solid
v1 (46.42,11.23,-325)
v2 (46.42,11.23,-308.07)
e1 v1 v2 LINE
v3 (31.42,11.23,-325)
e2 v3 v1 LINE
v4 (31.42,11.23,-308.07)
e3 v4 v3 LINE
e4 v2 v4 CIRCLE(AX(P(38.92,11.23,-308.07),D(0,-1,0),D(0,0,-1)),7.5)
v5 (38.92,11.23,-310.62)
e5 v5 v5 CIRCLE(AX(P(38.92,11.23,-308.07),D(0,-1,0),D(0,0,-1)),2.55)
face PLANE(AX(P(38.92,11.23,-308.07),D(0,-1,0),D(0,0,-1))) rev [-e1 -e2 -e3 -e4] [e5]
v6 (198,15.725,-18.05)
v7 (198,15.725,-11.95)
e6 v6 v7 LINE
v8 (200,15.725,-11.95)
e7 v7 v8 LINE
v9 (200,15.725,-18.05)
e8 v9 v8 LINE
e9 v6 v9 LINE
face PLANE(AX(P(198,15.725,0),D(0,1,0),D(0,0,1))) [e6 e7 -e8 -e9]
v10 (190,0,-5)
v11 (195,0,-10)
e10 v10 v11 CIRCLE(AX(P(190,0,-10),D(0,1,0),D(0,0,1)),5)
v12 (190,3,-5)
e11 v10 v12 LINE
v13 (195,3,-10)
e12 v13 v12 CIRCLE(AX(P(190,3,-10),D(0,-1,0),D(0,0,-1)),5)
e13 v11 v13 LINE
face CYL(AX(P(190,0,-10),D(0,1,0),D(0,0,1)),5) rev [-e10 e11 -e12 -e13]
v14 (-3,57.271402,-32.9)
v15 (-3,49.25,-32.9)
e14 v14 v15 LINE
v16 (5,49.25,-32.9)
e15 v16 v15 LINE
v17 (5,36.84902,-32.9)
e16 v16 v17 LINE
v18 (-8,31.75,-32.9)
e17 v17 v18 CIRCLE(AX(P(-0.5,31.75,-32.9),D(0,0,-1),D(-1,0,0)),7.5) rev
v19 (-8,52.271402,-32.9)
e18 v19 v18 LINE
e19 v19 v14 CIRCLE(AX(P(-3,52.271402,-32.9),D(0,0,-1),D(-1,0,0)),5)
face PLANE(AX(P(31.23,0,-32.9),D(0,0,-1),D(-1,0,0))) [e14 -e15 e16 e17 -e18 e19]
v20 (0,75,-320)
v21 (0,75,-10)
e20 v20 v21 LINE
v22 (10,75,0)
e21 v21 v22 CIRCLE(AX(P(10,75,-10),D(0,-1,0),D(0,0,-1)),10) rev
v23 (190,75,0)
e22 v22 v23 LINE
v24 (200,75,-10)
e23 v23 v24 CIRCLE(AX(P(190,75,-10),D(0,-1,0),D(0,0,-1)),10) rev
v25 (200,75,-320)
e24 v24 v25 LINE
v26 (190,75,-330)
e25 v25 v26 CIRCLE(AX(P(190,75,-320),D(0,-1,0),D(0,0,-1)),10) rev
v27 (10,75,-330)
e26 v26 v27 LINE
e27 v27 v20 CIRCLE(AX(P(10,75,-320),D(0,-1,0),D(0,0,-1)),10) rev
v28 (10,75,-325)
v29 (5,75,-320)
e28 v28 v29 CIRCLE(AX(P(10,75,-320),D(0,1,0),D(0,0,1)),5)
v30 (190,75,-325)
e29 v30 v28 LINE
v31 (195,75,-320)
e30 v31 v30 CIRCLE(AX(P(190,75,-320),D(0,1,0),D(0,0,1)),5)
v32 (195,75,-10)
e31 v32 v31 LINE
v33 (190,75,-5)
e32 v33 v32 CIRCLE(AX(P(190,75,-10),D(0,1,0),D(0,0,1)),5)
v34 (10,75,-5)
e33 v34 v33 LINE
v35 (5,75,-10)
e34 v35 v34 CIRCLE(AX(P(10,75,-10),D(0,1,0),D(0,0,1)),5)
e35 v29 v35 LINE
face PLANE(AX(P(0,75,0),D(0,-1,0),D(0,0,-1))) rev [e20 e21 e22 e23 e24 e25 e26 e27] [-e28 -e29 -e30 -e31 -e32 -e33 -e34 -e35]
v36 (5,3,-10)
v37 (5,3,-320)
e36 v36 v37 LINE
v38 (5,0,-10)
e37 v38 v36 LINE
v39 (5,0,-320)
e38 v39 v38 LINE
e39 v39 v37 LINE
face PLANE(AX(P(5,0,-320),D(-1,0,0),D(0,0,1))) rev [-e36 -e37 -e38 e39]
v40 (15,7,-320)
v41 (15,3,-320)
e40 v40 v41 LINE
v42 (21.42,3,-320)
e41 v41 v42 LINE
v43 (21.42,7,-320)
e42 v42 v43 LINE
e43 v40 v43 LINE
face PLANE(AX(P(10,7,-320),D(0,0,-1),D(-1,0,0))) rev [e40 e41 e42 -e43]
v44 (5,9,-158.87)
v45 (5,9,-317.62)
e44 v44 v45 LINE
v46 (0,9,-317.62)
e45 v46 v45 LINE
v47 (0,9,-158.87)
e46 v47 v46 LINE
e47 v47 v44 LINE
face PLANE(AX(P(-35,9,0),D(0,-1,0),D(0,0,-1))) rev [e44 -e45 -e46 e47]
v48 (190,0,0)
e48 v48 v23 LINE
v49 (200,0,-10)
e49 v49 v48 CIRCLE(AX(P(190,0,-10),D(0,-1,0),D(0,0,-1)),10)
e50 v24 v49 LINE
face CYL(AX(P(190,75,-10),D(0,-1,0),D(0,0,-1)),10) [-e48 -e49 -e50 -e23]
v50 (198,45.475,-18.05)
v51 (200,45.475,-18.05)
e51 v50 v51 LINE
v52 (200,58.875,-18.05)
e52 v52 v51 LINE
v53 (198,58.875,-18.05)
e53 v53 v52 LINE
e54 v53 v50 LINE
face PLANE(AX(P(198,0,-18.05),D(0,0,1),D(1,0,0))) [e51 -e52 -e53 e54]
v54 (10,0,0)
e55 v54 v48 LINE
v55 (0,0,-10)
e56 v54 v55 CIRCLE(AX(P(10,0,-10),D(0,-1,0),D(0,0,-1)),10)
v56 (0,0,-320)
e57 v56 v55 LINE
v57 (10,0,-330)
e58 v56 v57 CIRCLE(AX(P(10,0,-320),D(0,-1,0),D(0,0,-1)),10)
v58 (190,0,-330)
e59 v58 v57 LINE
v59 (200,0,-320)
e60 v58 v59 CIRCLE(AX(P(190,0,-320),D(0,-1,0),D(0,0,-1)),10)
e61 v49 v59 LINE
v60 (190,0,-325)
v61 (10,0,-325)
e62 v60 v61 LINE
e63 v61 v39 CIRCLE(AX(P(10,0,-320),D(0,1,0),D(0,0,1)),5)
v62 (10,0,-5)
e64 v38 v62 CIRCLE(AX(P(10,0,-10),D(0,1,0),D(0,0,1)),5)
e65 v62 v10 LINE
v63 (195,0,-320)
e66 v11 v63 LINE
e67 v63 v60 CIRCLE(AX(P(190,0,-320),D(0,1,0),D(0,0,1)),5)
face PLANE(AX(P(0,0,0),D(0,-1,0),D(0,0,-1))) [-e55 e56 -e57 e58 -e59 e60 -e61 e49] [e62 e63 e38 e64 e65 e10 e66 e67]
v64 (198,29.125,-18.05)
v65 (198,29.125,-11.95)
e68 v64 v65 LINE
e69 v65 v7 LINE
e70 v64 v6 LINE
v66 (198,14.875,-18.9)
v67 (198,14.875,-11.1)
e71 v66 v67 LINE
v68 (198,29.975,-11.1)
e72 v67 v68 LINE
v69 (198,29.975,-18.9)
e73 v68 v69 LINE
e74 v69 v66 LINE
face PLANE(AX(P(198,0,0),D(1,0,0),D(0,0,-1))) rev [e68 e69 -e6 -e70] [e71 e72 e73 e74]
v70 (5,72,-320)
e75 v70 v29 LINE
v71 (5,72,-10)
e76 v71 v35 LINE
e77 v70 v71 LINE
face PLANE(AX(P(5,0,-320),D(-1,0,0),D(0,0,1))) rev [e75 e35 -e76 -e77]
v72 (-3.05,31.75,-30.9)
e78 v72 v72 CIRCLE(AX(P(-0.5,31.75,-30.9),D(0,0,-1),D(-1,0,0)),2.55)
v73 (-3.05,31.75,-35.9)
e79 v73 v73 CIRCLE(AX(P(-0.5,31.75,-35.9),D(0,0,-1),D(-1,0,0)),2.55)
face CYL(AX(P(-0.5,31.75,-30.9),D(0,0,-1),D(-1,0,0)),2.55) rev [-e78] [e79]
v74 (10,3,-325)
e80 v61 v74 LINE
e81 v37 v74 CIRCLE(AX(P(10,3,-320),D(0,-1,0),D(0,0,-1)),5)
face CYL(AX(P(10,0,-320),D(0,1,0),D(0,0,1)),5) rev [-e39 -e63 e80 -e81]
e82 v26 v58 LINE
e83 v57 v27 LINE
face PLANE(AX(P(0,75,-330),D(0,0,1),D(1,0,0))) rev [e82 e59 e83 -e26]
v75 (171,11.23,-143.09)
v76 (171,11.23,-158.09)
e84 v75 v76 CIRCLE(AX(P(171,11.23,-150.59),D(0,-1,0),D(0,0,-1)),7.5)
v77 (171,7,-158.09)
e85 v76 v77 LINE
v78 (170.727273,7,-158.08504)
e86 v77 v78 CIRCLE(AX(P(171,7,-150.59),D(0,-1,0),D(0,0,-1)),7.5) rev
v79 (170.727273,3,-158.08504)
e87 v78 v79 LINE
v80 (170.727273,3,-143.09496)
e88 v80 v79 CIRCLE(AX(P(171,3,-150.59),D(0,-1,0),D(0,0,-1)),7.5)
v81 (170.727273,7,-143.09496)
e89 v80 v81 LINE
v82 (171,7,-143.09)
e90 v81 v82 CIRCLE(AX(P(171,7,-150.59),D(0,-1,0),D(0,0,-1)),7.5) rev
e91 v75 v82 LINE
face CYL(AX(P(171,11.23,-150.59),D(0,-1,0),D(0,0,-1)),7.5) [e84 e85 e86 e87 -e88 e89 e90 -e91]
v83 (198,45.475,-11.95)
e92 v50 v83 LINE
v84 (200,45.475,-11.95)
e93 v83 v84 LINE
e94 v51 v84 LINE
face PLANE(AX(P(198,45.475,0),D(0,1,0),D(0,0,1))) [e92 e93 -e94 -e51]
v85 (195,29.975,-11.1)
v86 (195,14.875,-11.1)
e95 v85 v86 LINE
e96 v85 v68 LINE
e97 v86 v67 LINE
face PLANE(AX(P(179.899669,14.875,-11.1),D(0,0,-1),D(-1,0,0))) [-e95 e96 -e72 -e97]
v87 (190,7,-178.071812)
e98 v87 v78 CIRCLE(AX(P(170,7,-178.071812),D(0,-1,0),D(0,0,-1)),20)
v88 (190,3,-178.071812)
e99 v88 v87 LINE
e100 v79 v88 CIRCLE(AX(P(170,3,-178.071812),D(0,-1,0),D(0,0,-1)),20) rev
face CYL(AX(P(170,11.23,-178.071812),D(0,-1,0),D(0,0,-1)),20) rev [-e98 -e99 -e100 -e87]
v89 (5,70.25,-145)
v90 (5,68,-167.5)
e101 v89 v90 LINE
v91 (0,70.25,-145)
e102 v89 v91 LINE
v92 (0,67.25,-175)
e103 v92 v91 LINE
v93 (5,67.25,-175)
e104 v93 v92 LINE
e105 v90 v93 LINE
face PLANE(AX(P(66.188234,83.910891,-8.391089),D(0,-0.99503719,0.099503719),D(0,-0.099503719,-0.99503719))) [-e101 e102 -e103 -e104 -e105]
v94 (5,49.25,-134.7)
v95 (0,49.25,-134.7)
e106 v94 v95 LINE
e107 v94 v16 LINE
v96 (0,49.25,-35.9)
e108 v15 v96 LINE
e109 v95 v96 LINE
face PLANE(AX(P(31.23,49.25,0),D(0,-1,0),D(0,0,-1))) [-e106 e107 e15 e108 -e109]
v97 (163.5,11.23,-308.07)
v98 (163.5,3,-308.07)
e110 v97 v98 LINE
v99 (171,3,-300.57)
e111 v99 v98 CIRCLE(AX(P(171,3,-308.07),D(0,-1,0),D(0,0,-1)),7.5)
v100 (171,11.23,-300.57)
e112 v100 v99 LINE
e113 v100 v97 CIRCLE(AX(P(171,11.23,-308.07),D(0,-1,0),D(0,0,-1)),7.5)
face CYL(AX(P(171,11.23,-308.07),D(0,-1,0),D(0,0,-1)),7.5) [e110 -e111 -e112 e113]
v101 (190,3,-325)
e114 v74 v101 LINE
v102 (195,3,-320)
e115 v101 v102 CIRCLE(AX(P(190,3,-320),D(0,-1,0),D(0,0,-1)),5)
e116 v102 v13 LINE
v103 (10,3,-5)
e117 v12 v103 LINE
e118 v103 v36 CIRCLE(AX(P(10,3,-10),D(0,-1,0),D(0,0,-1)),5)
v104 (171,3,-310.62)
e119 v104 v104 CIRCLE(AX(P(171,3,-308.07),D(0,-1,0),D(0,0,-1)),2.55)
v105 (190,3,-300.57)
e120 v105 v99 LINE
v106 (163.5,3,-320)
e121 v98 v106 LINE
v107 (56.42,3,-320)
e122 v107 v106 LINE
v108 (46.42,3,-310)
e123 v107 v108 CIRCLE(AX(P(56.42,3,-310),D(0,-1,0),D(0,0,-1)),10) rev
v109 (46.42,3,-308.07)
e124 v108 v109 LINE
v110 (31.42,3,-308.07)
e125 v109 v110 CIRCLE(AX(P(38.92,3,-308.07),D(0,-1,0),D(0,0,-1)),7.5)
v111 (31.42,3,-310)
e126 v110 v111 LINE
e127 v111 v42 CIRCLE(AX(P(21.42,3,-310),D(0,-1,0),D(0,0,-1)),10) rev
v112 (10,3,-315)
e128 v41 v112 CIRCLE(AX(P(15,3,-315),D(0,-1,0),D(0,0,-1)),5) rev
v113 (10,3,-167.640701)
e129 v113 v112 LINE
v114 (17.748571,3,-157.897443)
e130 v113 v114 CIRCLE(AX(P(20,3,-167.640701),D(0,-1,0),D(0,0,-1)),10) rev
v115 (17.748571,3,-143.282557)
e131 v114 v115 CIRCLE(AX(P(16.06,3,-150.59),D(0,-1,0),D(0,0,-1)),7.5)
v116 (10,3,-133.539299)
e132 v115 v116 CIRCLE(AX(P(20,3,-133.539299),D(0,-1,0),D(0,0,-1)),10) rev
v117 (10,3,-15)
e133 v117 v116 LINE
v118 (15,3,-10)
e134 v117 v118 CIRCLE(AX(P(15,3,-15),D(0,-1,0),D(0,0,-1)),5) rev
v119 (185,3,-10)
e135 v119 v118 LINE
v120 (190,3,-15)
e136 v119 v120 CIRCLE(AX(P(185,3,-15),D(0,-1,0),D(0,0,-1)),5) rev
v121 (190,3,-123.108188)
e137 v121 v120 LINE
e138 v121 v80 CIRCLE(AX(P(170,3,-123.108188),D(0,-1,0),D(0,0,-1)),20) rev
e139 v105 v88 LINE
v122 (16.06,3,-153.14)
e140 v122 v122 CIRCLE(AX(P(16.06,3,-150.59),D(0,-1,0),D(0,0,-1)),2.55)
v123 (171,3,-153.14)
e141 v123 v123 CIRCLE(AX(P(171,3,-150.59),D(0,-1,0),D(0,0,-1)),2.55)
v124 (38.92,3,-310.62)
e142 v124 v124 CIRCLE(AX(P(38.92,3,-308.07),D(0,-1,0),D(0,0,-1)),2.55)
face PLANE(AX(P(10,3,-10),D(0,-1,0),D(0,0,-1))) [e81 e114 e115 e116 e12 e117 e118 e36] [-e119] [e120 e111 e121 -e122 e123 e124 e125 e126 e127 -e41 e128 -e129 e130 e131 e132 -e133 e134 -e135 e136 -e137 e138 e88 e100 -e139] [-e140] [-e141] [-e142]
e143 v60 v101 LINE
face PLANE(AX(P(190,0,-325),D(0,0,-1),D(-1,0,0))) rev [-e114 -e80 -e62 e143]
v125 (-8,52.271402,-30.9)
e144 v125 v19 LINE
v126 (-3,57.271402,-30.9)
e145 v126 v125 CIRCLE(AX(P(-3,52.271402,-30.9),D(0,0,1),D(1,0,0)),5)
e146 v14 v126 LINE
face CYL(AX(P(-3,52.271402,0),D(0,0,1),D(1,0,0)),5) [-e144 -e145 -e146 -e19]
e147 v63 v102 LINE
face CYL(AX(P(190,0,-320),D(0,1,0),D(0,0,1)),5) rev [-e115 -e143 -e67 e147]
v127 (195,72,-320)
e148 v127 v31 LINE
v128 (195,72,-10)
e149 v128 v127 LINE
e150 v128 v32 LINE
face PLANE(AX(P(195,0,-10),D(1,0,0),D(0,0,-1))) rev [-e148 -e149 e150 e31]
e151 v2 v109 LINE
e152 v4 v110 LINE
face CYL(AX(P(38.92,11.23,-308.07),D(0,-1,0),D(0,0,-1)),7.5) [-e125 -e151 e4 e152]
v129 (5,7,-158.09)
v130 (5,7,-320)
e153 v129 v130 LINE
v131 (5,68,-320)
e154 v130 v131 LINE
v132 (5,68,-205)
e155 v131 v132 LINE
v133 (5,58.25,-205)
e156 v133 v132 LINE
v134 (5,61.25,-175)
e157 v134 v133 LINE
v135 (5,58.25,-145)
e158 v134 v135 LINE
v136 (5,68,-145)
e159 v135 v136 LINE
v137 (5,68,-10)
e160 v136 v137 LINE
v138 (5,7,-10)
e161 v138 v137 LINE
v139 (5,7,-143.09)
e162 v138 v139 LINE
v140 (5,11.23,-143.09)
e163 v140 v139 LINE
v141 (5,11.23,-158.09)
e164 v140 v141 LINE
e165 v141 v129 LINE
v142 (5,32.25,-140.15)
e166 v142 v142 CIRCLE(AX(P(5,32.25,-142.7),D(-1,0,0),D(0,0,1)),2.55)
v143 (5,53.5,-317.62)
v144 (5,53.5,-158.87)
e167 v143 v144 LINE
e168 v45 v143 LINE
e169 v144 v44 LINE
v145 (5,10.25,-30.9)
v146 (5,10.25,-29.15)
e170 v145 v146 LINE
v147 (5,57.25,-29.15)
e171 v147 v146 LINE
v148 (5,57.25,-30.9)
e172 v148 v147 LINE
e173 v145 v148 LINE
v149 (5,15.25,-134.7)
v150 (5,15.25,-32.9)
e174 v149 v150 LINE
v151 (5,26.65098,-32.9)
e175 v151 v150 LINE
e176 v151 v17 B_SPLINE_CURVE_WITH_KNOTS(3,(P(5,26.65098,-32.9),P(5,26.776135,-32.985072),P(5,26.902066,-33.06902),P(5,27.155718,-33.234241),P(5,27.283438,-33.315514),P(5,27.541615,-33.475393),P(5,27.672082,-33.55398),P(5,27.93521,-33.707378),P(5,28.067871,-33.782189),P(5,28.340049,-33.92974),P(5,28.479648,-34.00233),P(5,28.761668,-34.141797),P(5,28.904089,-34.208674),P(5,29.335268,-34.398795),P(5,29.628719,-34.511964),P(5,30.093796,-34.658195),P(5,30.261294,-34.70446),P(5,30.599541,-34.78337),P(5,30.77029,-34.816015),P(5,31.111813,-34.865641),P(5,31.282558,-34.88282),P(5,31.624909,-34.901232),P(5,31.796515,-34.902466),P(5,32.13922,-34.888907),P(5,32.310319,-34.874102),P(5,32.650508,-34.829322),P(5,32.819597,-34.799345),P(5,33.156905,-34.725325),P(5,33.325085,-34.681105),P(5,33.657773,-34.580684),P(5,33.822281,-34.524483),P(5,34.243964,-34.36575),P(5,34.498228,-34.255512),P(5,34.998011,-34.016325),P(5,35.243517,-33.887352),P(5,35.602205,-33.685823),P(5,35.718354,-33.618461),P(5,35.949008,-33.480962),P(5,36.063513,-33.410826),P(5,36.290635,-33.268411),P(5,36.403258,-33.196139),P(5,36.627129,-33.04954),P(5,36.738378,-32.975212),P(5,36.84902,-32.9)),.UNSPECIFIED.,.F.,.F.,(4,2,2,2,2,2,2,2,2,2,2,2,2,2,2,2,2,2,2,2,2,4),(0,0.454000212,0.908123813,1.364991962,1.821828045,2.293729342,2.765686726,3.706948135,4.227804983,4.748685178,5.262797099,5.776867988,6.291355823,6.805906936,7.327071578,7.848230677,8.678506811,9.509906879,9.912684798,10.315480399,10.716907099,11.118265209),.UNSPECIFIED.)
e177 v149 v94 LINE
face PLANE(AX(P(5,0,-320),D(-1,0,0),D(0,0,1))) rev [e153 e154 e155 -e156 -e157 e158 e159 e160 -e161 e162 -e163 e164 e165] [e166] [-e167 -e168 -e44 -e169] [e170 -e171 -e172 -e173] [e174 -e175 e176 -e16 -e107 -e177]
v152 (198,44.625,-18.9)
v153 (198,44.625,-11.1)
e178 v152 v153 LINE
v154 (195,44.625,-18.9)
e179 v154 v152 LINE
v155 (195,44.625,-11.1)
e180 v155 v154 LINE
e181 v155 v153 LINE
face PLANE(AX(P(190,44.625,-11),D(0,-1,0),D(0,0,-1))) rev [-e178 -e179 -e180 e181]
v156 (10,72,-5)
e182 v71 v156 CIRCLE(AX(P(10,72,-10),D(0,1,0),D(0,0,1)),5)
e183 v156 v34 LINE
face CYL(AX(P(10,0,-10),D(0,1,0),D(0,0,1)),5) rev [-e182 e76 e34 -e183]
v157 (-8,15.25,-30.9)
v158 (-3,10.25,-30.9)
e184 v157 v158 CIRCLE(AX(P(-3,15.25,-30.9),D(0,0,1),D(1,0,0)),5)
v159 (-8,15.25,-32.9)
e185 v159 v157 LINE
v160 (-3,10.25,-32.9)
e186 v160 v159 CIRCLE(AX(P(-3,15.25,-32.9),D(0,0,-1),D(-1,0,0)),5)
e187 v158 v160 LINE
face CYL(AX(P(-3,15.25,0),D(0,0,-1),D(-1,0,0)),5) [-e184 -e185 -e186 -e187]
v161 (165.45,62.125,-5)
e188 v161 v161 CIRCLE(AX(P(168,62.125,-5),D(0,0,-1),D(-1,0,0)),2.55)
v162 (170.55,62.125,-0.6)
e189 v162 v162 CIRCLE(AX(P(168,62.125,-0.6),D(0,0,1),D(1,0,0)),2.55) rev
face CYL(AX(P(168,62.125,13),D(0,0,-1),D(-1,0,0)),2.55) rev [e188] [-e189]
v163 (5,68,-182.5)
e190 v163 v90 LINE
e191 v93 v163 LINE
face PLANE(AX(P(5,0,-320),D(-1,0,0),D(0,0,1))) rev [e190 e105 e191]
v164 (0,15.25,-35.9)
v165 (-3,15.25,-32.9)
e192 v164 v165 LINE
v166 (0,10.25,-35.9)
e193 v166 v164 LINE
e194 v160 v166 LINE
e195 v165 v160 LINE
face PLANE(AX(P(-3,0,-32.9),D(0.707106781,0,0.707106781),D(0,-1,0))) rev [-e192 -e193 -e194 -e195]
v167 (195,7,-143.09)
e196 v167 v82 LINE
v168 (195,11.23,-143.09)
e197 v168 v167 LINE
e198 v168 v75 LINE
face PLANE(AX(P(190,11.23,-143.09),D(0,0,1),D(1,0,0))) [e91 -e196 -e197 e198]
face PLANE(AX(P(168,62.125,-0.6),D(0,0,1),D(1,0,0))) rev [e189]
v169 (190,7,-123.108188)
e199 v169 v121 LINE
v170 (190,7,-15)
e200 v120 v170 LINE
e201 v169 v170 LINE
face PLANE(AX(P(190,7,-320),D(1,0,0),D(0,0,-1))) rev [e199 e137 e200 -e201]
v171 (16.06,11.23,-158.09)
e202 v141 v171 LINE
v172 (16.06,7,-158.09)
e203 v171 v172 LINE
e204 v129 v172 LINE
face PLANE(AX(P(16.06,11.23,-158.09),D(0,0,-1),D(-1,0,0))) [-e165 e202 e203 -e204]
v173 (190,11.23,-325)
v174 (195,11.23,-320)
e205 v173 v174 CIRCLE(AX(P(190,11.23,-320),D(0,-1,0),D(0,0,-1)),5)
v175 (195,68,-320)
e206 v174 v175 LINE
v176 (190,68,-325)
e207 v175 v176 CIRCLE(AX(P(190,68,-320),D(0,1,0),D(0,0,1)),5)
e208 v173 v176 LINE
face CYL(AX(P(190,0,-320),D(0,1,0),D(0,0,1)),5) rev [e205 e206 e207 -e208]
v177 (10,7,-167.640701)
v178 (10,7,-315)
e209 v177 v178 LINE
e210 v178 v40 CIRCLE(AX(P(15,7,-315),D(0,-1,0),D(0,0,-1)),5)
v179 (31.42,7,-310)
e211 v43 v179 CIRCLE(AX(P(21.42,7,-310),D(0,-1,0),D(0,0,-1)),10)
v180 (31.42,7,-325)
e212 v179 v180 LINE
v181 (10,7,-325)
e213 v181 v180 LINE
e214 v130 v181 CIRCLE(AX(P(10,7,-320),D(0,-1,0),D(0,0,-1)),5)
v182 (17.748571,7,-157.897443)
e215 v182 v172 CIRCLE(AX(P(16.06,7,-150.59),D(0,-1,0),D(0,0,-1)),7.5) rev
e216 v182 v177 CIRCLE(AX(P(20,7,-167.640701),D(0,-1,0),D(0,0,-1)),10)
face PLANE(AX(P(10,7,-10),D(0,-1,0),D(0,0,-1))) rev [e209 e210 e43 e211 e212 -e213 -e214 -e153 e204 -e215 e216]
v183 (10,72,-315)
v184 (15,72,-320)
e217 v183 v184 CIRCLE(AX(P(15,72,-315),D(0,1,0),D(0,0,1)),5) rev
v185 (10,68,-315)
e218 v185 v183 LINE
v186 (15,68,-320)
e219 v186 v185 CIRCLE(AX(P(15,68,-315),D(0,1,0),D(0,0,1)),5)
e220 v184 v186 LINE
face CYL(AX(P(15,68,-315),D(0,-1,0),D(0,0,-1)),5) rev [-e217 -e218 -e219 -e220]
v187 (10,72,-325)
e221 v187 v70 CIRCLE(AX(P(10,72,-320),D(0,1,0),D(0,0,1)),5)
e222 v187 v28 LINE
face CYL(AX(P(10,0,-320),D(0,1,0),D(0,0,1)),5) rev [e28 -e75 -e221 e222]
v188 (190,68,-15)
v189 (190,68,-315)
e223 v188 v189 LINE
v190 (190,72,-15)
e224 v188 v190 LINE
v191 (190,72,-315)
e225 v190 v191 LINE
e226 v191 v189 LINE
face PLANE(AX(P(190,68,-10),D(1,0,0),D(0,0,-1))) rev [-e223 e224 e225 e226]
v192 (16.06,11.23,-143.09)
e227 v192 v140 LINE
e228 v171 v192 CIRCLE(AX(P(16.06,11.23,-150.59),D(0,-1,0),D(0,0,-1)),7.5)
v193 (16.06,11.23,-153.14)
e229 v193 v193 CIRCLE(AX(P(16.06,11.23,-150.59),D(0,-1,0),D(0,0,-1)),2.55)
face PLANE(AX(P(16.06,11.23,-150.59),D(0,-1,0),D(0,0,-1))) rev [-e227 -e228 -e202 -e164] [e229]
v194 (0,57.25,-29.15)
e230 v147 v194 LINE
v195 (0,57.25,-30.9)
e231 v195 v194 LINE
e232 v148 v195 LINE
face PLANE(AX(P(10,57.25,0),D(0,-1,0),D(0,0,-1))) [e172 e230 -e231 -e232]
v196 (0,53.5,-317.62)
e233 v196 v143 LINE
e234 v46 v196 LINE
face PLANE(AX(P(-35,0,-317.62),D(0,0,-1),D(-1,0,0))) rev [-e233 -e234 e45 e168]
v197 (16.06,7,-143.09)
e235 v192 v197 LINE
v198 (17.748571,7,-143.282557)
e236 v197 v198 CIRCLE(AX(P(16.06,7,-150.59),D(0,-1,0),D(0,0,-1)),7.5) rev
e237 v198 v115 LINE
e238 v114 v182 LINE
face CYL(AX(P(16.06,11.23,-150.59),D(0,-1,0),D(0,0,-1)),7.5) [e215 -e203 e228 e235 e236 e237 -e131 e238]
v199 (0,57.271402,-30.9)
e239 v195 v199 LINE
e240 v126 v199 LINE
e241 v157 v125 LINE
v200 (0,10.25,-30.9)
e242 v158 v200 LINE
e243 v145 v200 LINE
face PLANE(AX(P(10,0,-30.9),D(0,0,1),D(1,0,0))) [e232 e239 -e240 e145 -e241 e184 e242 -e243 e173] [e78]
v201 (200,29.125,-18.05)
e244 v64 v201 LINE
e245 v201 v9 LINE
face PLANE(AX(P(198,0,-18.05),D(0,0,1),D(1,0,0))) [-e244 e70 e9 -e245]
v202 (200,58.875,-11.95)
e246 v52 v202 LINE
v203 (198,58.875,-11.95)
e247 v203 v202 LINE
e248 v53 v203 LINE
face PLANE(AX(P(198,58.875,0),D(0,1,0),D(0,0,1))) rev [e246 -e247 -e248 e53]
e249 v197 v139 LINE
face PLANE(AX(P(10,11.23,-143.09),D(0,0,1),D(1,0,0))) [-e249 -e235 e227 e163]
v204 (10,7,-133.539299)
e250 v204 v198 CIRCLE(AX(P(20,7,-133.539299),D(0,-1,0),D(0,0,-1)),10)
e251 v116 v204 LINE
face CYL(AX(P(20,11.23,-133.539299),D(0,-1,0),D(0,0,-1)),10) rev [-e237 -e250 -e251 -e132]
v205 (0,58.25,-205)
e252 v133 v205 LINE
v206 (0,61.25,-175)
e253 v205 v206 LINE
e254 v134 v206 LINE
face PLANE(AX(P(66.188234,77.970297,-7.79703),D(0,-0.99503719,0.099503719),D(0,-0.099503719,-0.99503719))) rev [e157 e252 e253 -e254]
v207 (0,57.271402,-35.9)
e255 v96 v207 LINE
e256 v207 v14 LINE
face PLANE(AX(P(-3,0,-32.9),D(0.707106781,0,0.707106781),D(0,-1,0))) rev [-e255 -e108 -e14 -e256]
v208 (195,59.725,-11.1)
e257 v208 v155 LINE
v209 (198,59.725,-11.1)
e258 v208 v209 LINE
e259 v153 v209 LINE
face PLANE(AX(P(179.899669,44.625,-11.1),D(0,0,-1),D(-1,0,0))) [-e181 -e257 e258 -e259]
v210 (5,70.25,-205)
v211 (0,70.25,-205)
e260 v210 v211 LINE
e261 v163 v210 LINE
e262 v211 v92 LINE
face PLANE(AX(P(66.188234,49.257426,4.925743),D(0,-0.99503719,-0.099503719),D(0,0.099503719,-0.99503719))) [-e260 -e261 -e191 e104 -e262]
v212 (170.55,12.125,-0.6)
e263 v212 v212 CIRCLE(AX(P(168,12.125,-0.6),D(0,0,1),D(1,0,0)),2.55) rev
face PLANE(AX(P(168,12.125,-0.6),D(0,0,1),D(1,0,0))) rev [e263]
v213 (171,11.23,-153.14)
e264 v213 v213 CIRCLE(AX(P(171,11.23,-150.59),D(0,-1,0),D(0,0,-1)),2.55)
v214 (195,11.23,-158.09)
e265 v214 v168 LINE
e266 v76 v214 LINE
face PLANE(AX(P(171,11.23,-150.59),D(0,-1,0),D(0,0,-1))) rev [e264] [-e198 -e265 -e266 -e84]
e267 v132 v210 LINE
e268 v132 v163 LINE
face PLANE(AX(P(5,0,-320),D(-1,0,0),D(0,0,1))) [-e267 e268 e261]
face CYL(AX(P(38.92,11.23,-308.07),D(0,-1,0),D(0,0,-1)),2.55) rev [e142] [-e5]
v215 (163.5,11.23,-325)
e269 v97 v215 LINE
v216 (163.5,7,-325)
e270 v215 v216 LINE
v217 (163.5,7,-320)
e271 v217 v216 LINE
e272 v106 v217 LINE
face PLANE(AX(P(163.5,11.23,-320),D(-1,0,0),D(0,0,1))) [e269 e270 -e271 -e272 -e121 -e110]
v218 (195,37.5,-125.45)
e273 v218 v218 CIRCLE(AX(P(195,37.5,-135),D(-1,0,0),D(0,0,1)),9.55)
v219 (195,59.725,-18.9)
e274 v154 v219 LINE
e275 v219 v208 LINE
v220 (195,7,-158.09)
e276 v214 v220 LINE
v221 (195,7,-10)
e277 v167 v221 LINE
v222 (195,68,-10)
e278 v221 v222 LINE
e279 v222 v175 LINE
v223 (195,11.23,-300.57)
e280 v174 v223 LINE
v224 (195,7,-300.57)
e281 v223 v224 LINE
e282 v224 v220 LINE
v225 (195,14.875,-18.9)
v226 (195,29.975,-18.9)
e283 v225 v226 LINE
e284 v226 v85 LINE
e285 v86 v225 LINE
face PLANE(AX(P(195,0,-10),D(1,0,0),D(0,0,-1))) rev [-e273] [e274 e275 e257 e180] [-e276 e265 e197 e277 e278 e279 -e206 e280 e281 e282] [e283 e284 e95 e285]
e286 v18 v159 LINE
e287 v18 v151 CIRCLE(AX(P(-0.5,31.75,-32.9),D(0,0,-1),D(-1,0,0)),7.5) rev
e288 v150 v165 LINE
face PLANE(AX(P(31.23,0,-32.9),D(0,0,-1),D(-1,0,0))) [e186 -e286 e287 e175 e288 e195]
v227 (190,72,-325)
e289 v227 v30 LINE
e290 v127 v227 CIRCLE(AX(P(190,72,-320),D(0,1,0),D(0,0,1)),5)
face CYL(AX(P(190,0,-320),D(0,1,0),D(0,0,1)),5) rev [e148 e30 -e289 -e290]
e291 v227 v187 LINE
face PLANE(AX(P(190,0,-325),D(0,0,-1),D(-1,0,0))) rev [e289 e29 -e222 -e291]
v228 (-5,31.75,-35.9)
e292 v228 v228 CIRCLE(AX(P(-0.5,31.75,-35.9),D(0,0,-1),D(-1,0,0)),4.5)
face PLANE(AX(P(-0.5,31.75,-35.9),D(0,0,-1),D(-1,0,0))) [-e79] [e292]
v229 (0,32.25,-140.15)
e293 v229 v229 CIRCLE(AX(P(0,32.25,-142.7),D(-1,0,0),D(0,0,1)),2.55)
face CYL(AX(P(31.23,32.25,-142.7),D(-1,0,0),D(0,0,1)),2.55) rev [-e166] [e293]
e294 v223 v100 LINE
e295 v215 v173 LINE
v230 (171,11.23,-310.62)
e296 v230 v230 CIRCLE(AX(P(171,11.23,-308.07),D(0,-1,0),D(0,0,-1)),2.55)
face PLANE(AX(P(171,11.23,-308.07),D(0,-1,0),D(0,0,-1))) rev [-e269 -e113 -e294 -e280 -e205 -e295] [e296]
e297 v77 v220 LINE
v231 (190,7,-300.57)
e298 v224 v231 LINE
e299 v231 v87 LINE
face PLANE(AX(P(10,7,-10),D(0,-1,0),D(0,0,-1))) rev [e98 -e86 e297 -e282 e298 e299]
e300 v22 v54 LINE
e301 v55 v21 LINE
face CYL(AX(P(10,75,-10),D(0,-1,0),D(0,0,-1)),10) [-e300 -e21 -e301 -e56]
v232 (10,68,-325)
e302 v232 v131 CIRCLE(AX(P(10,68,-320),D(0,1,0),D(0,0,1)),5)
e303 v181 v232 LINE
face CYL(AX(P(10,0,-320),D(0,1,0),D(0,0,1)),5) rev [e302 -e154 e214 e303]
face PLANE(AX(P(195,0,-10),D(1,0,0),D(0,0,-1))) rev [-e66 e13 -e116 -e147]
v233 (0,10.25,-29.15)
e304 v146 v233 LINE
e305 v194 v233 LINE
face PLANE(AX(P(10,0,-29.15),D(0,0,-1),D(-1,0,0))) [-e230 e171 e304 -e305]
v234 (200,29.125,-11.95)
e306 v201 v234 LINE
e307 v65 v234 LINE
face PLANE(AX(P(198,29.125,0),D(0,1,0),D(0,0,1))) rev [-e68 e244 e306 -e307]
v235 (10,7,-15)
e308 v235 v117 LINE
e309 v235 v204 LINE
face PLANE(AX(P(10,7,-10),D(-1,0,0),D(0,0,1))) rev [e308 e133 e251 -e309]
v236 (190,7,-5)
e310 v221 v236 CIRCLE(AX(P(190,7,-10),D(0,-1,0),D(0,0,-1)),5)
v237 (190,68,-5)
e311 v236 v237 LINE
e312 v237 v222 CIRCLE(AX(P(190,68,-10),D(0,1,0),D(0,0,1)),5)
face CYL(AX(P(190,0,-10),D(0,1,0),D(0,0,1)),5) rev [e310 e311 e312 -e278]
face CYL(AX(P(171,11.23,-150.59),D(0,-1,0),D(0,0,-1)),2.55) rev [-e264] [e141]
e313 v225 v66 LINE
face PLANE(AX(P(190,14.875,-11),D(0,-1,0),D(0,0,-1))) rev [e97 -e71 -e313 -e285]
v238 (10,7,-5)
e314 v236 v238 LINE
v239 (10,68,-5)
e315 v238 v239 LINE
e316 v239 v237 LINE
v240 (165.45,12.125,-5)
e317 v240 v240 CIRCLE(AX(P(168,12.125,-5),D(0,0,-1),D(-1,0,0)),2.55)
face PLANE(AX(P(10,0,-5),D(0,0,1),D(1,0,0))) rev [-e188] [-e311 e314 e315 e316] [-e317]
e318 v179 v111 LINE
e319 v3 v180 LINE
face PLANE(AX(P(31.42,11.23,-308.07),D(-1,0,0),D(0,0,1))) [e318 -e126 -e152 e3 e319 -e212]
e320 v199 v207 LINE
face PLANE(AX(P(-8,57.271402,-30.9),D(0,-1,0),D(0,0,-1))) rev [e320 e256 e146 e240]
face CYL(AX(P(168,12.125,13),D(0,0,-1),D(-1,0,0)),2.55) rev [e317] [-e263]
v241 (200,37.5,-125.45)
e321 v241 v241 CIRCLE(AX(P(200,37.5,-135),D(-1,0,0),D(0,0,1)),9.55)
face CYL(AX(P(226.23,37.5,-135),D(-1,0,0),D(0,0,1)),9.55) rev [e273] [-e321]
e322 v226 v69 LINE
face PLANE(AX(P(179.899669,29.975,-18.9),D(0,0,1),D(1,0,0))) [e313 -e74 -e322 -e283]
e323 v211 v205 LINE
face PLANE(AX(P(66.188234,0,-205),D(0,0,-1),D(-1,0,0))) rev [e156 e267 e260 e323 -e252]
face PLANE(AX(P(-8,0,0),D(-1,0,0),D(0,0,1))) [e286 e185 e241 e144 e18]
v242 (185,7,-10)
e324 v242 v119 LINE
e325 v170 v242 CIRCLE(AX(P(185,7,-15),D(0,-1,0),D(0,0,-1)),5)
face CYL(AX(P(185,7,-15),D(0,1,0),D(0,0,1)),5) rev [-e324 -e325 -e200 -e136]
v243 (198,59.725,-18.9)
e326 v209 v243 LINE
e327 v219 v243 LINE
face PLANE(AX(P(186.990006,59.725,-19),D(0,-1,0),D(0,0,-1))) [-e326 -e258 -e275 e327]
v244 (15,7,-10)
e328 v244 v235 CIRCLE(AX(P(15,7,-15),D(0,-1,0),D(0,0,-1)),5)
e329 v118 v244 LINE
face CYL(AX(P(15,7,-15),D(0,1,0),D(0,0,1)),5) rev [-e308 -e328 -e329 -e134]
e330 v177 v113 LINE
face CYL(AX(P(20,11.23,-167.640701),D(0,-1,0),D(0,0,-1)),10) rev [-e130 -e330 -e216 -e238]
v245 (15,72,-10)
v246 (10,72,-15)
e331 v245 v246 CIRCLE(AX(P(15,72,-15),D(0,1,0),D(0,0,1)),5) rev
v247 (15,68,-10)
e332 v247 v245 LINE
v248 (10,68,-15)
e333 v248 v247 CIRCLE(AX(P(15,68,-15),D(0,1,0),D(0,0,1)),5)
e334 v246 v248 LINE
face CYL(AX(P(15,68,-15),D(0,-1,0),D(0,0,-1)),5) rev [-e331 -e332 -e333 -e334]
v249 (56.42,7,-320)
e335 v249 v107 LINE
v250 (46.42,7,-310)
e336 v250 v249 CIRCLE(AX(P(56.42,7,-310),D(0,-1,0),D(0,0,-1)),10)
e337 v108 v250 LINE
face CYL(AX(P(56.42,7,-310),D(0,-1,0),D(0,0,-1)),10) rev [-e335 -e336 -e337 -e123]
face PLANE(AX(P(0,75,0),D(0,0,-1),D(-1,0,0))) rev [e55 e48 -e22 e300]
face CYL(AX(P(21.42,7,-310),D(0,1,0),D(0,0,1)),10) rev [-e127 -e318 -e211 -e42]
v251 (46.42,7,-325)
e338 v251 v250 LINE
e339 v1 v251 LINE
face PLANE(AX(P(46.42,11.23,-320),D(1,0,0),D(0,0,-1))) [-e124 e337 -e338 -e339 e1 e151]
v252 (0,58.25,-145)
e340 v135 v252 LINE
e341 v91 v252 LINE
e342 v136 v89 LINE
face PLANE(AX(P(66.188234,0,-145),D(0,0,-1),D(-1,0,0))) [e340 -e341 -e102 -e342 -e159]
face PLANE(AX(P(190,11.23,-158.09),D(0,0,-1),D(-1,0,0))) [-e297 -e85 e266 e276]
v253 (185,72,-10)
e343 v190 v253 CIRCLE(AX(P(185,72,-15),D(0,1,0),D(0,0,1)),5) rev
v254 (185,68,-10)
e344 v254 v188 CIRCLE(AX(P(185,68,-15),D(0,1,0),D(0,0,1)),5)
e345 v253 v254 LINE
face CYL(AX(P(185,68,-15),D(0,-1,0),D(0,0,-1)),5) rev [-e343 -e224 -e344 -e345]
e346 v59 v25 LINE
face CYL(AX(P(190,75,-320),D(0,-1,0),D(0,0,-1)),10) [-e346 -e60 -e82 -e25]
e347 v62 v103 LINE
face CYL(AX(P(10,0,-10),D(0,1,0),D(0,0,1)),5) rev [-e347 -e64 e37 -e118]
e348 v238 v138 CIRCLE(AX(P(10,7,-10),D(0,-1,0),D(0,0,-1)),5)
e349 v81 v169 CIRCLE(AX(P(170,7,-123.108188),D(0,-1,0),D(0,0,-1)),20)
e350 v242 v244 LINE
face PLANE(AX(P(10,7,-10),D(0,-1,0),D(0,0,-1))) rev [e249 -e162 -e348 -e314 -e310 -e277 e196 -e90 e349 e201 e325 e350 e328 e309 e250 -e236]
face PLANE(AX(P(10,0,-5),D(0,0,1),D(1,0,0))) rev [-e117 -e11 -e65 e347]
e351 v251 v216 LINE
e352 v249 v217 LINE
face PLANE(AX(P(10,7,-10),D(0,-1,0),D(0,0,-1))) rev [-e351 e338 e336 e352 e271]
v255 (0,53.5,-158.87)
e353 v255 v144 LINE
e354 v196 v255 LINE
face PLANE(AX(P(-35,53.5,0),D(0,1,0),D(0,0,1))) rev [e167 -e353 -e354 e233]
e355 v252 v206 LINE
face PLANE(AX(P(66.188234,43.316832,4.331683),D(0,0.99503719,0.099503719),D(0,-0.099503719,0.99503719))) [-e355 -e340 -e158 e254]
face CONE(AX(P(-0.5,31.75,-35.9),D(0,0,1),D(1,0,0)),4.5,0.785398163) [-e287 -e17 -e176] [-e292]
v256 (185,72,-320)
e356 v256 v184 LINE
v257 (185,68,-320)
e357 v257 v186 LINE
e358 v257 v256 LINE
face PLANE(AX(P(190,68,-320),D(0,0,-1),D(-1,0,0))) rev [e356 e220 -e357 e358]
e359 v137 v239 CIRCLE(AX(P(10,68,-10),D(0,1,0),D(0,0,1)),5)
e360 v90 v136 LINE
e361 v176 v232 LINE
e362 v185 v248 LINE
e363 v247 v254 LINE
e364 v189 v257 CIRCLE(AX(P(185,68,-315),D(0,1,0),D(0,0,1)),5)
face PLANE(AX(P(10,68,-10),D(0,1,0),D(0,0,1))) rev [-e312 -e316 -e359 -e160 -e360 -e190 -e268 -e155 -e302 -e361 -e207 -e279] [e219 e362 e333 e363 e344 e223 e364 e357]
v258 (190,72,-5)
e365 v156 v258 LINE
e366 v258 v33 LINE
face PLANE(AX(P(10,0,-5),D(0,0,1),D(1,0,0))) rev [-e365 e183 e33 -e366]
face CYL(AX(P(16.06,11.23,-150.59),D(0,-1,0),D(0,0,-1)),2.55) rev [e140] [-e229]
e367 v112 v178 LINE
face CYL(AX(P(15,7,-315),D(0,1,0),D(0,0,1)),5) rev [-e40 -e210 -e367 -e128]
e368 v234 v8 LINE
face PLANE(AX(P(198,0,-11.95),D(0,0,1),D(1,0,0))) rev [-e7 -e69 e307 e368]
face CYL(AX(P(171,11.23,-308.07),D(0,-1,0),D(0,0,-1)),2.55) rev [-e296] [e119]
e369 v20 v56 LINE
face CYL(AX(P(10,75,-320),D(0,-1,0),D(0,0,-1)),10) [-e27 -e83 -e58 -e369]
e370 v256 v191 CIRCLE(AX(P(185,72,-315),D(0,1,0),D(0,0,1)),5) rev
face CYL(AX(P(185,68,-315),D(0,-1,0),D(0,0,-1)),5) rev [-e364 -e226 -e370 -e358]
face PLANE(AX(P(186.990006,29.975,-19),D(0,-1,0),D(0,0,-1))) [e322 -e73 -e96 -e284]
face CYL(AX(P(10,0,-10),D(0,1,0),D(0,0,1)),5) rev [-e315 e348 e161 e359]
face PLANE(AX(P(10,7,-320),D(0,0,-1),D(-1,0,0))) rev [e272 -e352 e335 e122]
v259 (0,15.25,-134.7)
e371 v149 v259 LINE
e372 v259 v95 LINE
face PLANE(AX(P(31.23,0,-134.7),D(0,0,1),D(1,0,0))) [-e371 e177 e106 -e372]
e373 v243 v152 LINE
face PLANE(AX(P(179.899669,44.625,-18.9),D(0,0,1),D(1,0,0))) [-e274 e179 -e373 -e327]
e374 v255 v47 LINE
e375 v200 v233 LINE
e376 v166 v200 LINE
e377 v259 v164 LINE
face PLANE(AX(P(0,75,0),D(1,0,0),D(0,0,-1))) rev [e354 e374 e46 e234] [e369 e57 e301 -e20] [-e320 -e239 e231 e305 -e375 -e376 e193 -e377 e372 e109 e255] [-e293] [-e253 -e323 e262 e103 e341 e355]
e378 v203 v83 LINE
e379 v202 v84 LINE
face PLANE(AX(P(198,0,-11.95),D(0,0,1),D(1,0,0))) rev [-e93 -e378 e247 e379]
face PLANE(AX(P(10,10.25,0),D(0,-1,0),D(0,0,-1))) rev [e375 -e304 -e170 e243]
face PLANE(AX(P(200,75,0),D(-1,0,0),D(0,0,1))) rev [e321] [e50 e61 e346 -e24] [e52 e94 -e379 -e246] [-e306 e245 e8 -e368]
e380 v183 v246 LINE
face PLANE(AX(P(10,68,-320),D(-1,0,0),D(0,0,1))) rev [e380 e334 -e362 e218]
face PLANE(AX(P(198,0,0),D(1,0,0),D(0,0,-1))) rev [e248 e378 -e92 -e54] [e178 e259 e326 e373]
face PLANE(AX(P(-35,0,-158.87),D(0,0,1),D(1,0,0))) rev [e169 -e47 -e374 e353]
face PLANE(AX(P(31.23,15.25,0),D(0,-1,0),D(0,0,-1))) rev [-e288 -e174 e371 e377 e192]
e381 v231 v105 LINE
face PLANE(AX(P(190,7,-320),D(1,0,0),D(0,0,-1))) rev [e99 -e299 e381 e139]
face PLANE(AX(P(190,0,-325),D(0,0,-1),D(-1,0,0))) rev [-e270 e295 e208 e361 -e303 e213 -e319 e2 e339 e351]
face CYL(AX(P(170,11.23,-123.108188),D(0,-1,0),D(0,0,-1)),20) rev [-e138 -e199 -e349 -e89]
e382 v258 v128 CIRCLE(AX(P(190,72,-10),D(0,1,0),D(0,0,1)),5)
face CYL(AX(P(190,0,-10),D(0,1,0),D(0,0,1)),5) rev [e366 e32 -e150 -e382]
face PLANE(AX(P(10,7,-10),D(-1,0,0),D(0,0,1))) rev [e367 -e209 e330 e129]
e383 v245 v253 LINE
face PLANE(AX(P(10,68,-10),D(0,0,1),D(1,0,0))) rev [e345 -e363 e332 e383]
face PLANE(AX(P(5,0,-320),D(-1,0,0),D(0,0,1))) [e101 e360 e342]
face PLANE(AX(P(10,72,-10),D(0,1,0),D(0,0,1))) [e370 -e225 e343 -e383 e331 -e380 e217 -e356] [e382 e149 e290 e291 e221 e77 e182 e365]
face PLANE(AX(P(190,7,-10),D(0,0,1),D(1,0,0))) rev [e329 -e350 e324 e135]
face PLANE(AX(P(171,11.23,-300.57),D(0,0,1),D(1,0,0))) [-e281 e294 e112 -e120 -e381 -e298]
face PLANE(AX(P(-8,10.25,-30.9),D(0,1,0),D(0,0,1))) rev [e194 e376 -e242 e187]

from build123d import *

# Parameters (mm, degrees)
SKETCH1_W            = 200
SKETCH1_H            = 330
BOSS_EXTRUDE1_DEPTH  = 75
FILLET1_R            = 10
CUT_EXTRUDE1_DEPTH   = 75
SKETCH3_W            = 180
SKETCH3_H            = 310
BOSS_EXTRUDE2_DEPTH  = 4
BOSS_EXTRUDE3_START  = -4
SKETCH4_W            = 180
SKETCH4_H            = 310
BOSS_EXTRUDE3_DEPTH  = 4
SKETCH8_W            = 158.75
SKETCH8_H            = 44.5
CUT_EXTRUDE2_DEPTH   = 40
BOSS_EXTRUDE4_START  = -8.23
SKETCH11_R           = 2.55
BOSS_EXTRUDE4_DEPTH  = 8.23
SKETCH12_R           = 2.55
SKETCH12_W           = 101.8
SKETCH12_H           = 34
CUT_EXTRUDE3_DEPTH   = 31.23
SKETCH13_R           = 9.55
CUT_EXTRUDE4_DEPTH   = 31.23
FILLET2_R            = 10
FILLET3_R            = 20
FILLET4_R            = 5
CUT_EXTRUDE5_DEPTH   = 10
SKETCH15_W           = 2
SKETCH15_H           = 47.02140159
BOSS_EXTRUDE5_DEPTH  = 8
SKETCH16_R           = 2.55
CUT_EXTRUDE6_DEPTH   = 2
BOSS_EXTRUDE6_START  = 3
SKETCH17_R           = 4.5
SKETCH17_R_2         = 2.55
BOSS_EXTRUDE6_DEPTH  = 3
CHAMFER1_SIZE        = 3
FILLET5_R            = 5
CHAMFER2_SIZE        = 3
SKETCH19_W           = 7
SKETCH19_H           = 14.5
CUT_EXTRUDE8_DEPTH   = 18
SKETCH22_W           = 7
SKETCH22_H           = 0.375
CUT_EXTRUDE9_DEPTH   = 18
SKETCH23_W           = 7
SKETCH23_H           = 0.375
BOSS_EXTRUDE7_DEPTH  = 5
SKETCH20_R           = 2.55
CUT_EXTRUDE10_DEPTH  = 18
SKETCH24_W           = 8
SKETCH24_H           = 15.5
CUT_EXTRUDE12_DEPTH  = 10
SKETCH25_W           = 8
SKETCH25_H           = 0.4
BOSS_EXTRUDE8_DEPTH  = 5
SKETCH26_W           = 0.1
SKETCH26_H           = 15.1
BOSS_EXTRUDE9_DEPTH  = 5
BOSS_EXTRUDE10_DEPTH = 2
SKETCH28_W           = 12.985784693
SKETCH28_H           = 10.415883014
BOSS_EXTRUDE11_DEPTH = 5
BOSS_EXTRUDE12_START = -0.6
SKETCH29_R           = 2.55
BOSS_EXTRUDE12_DEPTH = 0.6
CUT_EXTRUDE13_DEPTH  = 5


with BuildPart() as part:
    # Sketch1 → Boss-Extrude1 (new body)
    with BuildSketch(Plane(origin=(0, 0, 0), x_dir=(1, 0, 0), z_dir=(0, 1, 0))):
        with Locations((100, 165)):
            Rectangle(SKETCH1_W, SKETCH1_H)
    extrude(amount=BOSS_EXTRUDE1_DEPTH)

    # Fillet1
    fillet1_edges = [part.edges().sort_by_distance(p)[0] for p in [
        (0, 37.5, -330),
        (200, 37.5, -330),
        (200, 37.5, 0),
        (0, 37.5, 0),
    ]]
    fillet(fillet1_edges, radius=FILLET1_R)

    # Sketch2 → Cut-Extrude1 (cut)
    with BuildSketch(Plane(origin=(0, 75, 0), x_dir=(1, 0, 0), z_dir=(0, 1, 0))):
        with BuildLine():
            Line((190, 325), (10, 325))
            ThreePointArc((10, 325), (6.464466094, 323.535533906), (5, 320))
            Line((5, 320), (5, 10))
            ThreePointArc((5, 10), (6.464466094, 6.464466094), (10, 5))
            Line((10, 5), (190, 5))
            ThreePointArc((190, 5), (193.535533906, 6.464466094), (195, 10))
            Line((195, 10), (195, 320))
            ThreePointArc((195, 320), (193.535533906, 323.535533906), (190, 325))
        make_face()
    extrude(amount=-CUT_EXTRUDE1_DEPTH, mode=Mode.SUBTRACT)

    # Sketch3 → Boss-Extrude2 (add)
    with BuildSketch(Plane(origin=(0, 72, 0), x_dir=(1, 0, 0), z_dir=(0, 1, 0))):
        with BuildLine():
            Line((10, 5), (190, 5))
            ThreePointArc((190, 5), (193.535533906, 6.464466094), (195, 10))
            Line((195, 10), (195, 320))
            ThreePointArc((195, 320), (193.535533906, 323.535533906), (190, 325))
            Line((190, 325), (10, 325))
            ThreePointArc((10, 325), (6.464466094, 323.535533906), (5, 320))
            Line((5, 320), (5, 10))
            ThreePointArc((5, 10), (6.464466094, 6.464466094), (10, 5))
        make_face()
        with Locations((100, 165)):
            Rectangle(SKETCH3_W, SKETCH3_H, mode=Mode.SUBTRACT)
    extrude(amount=-BOSS_EXTRUDE2_DEPTH)

    # Sketch4 → Boss-Extrude3 (add)
    with BuildSketch(Plane(origin=(0, 3, 0), x_dir=(-1, 0, 0), z_dir=(0, -1, 0)).offset(BOSS_EXTRUDE3_START)):
        with BuildLine():
            Line((-5, 10), (-5, 320))
            ThreePointArc((-5, 320), (-6.464466094, 323.535533906), (-10, 325))
            Line((-10, 325), (-190, 325))
            ThreePointArc((-190, 325), (-193.535533906, 323.535533906), (-195, 320))
            Line((-195, 320), (-195, 10))
            ThreePointArc((-195, 10), (-193.535533906, 6.464466094), (-190, 5))
            Line((-190, 5), (-10, 5))
            ThreePointArc((-10, 5), (-6.464466094, 6.464466094), (-5, 10))
        make_face()
        with Locations((-100, 165)):
            Rectangle(SKETCH4_W, SKETCH4_H, mode=Mode.SUBTRACT)
    extrude(amount=BOSS_EXTRUDE3_DEPTH)

    # Sketch8 → Cut-Extrude2 (cut)
    with BuildSketch(Plane(origin=(5, 0, 0), x_dir=(0, 0, -1), z_dir=(1, 0, 0))):
        with Locations((238.245, 31.25)):
            Rectangle(SKETCH8_W, SKETCH8_H)
    extrude(amount=-CUT_EXTRUDE2_DEPTH, mode=Mode.SUBTRACT)

    # Sketch11 → Boss-Extrude4 (add)
    # profile 1 of 4: a face of its own
    with BuildSketch(Plane.XZ.offset(-3).offset(BOSS_EXTRUDE4_START)):
        with BuildLine():
            Line((16.06, -158.09), (10, -158.09))
            Line((10, -158.09), (5, -158.09))
            Line((5, -158.09), (5, -143.09))
            Line((5, -143.09), (10, -143.09))
            Line((10, -143.09), (16.06, -143.09))
            ThreePointArc((16.06, -143.09), (23.56, -150.59), (16.06, -158.09))
        make_face()
        with Locations(Location((16.06, -150.59, 0), (0, 0, 270))):
            Circle(SKETCH11_R, mode=Mode.SUBTRACT)
    # profile 2 of 4: a face of its own
    with BuildSketch(Plane.XZ.offset(-3).offset(BOSS_EXTRUDE4_START)):
        with BuildLine():
            Line((31.42, -308.07), (31.42, -320))
            Line((31.42, -320), (31.42, -325))
            Line((31.42, -325), (46.42, -325))
            Line((46.42, -325), (46.42, -320))
            Line((46.42, -320), (46.42, -308.07))
            ThreePointArc((46.42, -308.07), (38.92, -300.57), (31.42, -308.07))
        make_face()
        with Locations(Location((38.92, -308.07, 0), (0, 0, 270))):
            Circle(SKETCH11_R, mode=Mode.SUBTRACT)
    # profile 3 of 4: a face of its own
    with BuildSketch(Plane.XZ.offset(-3).offset(BOSS_EXTRUDE4_START)):
        with BuildLine():
            Line((171, -300.57), (190, -300.57))
            Line((190, -300.57), (195, -300.57))
            Line((195, -300.57), (195, -320))
            ThreePointArc((195, -320), (193.535533906, -323.535533906), (190, -325))
            Line((190, -325), (163.5, -325))
            Line((163.5, -325), (163.5, -320))
            Line((163.5, -320), (163.5, -308.07))
            ThreePointArc((163.5, -308.07), (165.696699141, -302.766699141), (171, -300.57))
        make_face()
        with Locations(Location((171, -308.07, 0), (0, 0, 270))):
            Circle(SKETCH11_R, mode=Mode.SUBTRACT)
    # profile 4 of 4: a face of its own
    with BuildSketch(Plane.XZ.offset(-3).offset(BOSS_EXTRUDE4_START)):
        with BuildLine():
            Line((171, -158.09), (190, -158.09))
            Line((190, -158.09), (195, -158.09))
            Line((195, -158.09), (195, -143.09))
            Line((195, -143.09), (190, -143.09))
            Line((190, -143.09), (171, -143.09))
            ThreePointArc((171, -143.09), (163.5, -150.59), (171, -158.09))
        make_face()
        with Locations(Location((171, -150.59, 0), (0, 0, 270))):
            Circle(SKETCH11_R, mode=Mode.SUBTRACT)
    extrude(amount=BOSS_EXTRUDE4_DEPTH)

    # Sketch12 → Cut-Extrude3 (cut)
    with BuildSketch(Plane.ZY):
        with Locations((-142.7, 32.25)):
            Circle(SKETCH12_R)
        with Locations((-83.8, 32.25)):
            Rectangle(SKETCH12_W, SKETCH12_H)
    extrude(amount=-CUT_EXTRUDE3_DEPTH, mode=Mode.SUBTRACT)

    # Sketch13 → Cut-Extrude4 (cut)
    with BuildSketch(Plane.ZY.offset(-195)):
        with Locations((-135, 37.5)):
            Circle(SKETCH13_R)
    extrude(amount=-CUT_EXTRUDE4_DEPTH, mode=Mode.SUBTRACT)

    # Fillet2
    # the kernel refuses this fillet: 10 mm, written as the material it adds along each edge
    with BuildSketch(Plane(origin=(31.42, 3, -320), x_dir=(0, 0, 1), z_dir=(0, 1, 0))) as fillet2_piece_1:
        with BuildLine():
            CenterArc((FILLET2_R, -FILLET2_R), FILLET2_R, 90, 90)
            Line((0, -FILLET2_R), (0, 0))
            Line((0, 0), (FILLET2_R, 0))
        make_face()
    extrude(amount=4)
    with BuildSketch(Plane(origin=(46.42, 7, -320), x_dir=(1, 0, 0), z_dir=(0, -1, 0))) as fillet2_piece_2:
        with BuildLine():
            CenterArc((FILLET2_R, FILLET2_R), FILLET2_R, 180, 90)
            Line((0, FILLET2_R), (0, 0))
            Line((0, 0), (FILLET2_R, 0))
        make_face()
    extrude(amount=4)
    with BuildSketch(Plane(origin=(10, 7, -143.09), x_dir=(0.9996913663867205, 0, -0.02484294611859972), z_dir=(0, -1, 0))) as fillet2_piece_3:
        with BuildLine():
            CenterArc((9.759646117, 9.796182659), FILLET2_R, 181.423542417, 76.988721184)
            Line((-0.237267547, 9.547753198), (-1.236958913, 9.522910252))
            Line((-1.236958913, 9.522910252), (-0.999691366, -0.024842946))
            Line((-0.999691366, -0.024842946), (0.024842946, -0.999691366))
            ThreePointArc((0.024842946, -0.999691366), (6.082972626, -0.849143113), (7.550095388, -0.979618266))
            Line((7.550095388, -0.979618266), (7.750963636, 0))
        make_face()
    extrude(amount=4)
    with BuildSketch(Plane(origin=(10, 3, -158.09), x_dir=(0, 0, -1), z_dir=(0, 1, 0))) as fillet2_piece_4:
        with BuildLine():
            CenterArc((9.550700865, -10), FILLET2_R, 90, 76.988721184)
            Line((-0.192556772, -7.748571429), (-1.166882536, -7.523428571))
            ThreePointArc((-1.166882536, -7.523428571), (-1, -6.06), (-1, 0))
            Line((-1, 0), (0, 1))
            Line((0, 1), (9.550700865, 1))
            Line((9.550700865, 1), (9.550700865, 0))
        make_face()
    extrude(amount=4)

    # Fillet3
    # the kernel refuses this fillet: 20 mm, written as the material it adds along each edge
    with BuildSketch(Plane(origin=(190, 7, -143.09), x_dir=(-0.9999999668790588, 0, -0.00025737498219353277), z_dir=(0, -1, 0))) as fillet3_piece_1:
        with BuildLine():
            CenterArc((19.994856519, -19.986959005), FILLET3_R, 92.069195834, 87.916057665)
            Line((-0.005142819, -19.981811506), (-2.005142752, -19.981296756))
            Line((-2.005142752, -19.981296756), (-1.999999934, 0.00051475))
            Line((-1.999999934, 0.00051475), (0.00051475, 1.999999934))
            ThreePointArc((0.00051475, 1.999999934), (19.000514121, 1.995109809), (19.20051505, 1.998695901))
            Line((19.20051505, 1.998695901), (19.272727911, 0))
        make_face()
    extrude(amount=4)
    with BuildSketch(Plane(origin=(190, 3, -158.09), x_dir=(0, 0, -1), z_dir=(0, 1, 0))) as fillet3_piece_2:
        with BuildLine():
            CenterArc((19.981812167, 20), FILLET3_R, 182.083942335, 87.916057665)
            Line((-0.004960318, 19.272727273), (-2.003637567, 19.2))
            ThreePointArc((-2.003637567, 19.2), (-2, 19), (-2, 0))
            Line((-2, 0), (0, -2))
            Line((0, -2), (19.981812167, -2))
            Line((19.981812167, -2), (19.981812167, 0))
        make_face()
    extrude(amount=4)

    # Fillet4
    fillet4_edges = [part.edges().sort_by_distance(p)[0] for p in [
        (10, 5, -320),
        (10, 5, -10),
        (190, 5, -10),
        (10, 70, -10),
        (10, 70, -320),
        (190, 70, -320),
        (190, 70, -10),
    ]]
    fillet(fillet4_edges, radius=FILLET4_R)

    # Sketch14 → Cut-Extrude5 (cut)
    with BuildSketch(Plane.ZY):
        Polygon((-30.9, 49.25), (-30.9, 15.25), (-30.9, 10.25), (-29.15, 10.25), (-29.15, 57.25), (-30.9, 57.25), align=None)
    extrude(amount=-CUT_EXTRUDE5_DEPTH, mode=Mode.SUBTRACT)

    # Sketch15 → Boss-Extrude5 (add)
    with BuildSketch(Plane.ZY):
        with Locations((-31.9, 33.760700795)):
            Rectangle(SKETCH15_W, SKETCH15_H)
    extrude(amount=BOSS_EXTRUDE5_DEPTH)

    # Sketch16 → Cut-Extrude6 (cut)
    with BuildSketch(Plane(origin=(0, 0, -32.9), x_dir=(-1, 0, 0), z_dir=(0, 0, -1))):
        with Locations((0.5, 31.75)):
            Circle(SKETCH16_R)
    extrude(amount=-CUT_EXTRUDE6_DEPTH, mode=Mode.SUBTRACT)

    # Sketch17 → Boss-Extrude6 (add)
    with BuildSketch(Plane(origin=(0, 0, -32.9), x_dir=(-1, 0, 0), z_dir=(0, 0, -1)).offset(BOSS_EXTRUDE6_START)):
        with Locations((0.5, 31.75)):
            Circle(SKETCH17_R)
        with Locations((0.5, 31.75)):
            Circle(SKETCH17_R_2, mode=Mode.SUBTRACT)
    extrude(amount=-BOSS_EXTRUDE6_DEPTH)

    # Chamfer1
    # the kernel refuses this chamfer: 3 mm, written as the material it adds along each edge
    with BuildSketch(Plane(origin=(-0.5, 31.75, -32.9), x_dir=(-1, 0, 0), z_dir=(0, -1, 0))) as chamfer1_piece_1_section:
        Polygon((4.5, CHAMFER1_SIZE), (4.5 + CHAMFER1_SIZE, 0), (4.5, 0), align=None)
    chamfer1_piece_1 = revolve(axis=Axis((-0.5, 31.75, -32.9), (0, 0, -1)), mode=Mode.PRIVATE)
    chamfer1_piece_1 = split(chamfer1_piece_1, bisect_by=Plane(origin=(5, 36.059247984, -35.347606696), z_dir=(-1, 0, 0)), keep=Keep.TOP, mode=Mode.PRIVATE)
    chamfer1_piece_1 = split(chamfer1_piece_1, bisect_by=Plane(origin=(-8, 36.059247984, -35.347606696), z_dir=(1, 0, 0)), keep=Keep.TOP, mode=Mode.PRIVATE)
    chamfer1_piece_1 = split(chamfer1_piece_1, bisect_by=Plane(origin=(-2.987945483, 36.059247984, -35.9), z_dir=(0, 0, 1)), keep=Keep.TOP, mode=Mode.PRIVATE)
    add(chamfer1_piece_1)

    # Fillet5
    fillet5_edges = [part.edges().sort_by_distance(p)[0] for p in [
        (-8, 57.27140159, -31.9),
        (-8, 10.25, -31.9),
    ]]
    fillet(fillet5_edges, radius=FILLET5_R)

    # Chamfer2
    chamfer2_edges = [part.edges().sort_by_distance(p)[0] for p in [
        (0, 53.260700795, -32.9),
        (0, 12.75, -32.9),
    ]]
    chamfer(chamfer2_edges, length=CHAMFER2_SIZE)

    # Sketch19 → Cut-Extrude8 (cut)
    with BuildSketch(Plane(origin=(200, 0, 0), x_dir=(0, 0, -1), z_dir=(1, 0, 0))):
        with Locations((15, 52)):
            Rectangle(SKETCH19_W, SKETCH19_H)
        with Locations((15, 22.25)):
            Rectangle(SKETCH19_W, SKETCH19_H)
    extrude(amount=-CUT_EXTRUDE8_DEPTH, mode=Mode.SUBTRACT)

    # Sketch22 → Cut-Extrude9 (cut)
    with BuildSketch(Plane(origin=(200, 0, 0), x_dir=(0, 0, -1), z_dir=(1, 0, 0))):
        with Locations((15, 59.4375)):
            Rectangle(SKETCH22_W, SKETCH22_H)
        with Locations((15, 29.6875)):
            Rectangle(SKETCH22_W, SKETCH22_H)
    extrude(amount=-CUT_EXTRUDE9_DEPTH, mode=Mode.SUBTRACT)

    # Sketch23 → Boss-Extrude7 (add)
    with BuildSketch(Plane(origin=(200, 0, 0), x_dir=(0, 0, -1), z_dir=(1, 0, 0))):
        with Locations((15, 44.9375)):
            Rectangle(SKETCH23_W, SKETCH23_H)
        with Locations((15, 15.1875)):
            Rectangle(SKETCH23_W, SKETCH23_H)
    extrude(amount=-BOSS_EXTRUDE7_DEPTH)

    # Sketch20 → Cut-Extrude10 (cut)
    with BuildSketch(Plane(origin=(0, 0, -5), x_dir=(-1, 0, 0), z_dir=(0, 0, -1))):
        with Locations((-178, 37.125)):
            Circle(SKETCH20_R)
        with Locations((-168, 62.125)):
            Circle(SKETCH20_R)
        with Locations((-168, 12.125)):
            Circle(SKETCH20_R)
    extrude(amount=-CUT_EXTRUDE10_DEPTH, mode=Mode.SUBTRACT)

    # Sketch24 → Cut-Extrude12 (cut)
    with BuildSketch(Plane(origin=(200, 0, 0), x_dir=(0, 0, -1), z_dir=(1, 0, 0))):
        with Locations((15, 22.625)):
            Rectangle(SKETCH24_W, SKETCH24_H)
        with Locations((15, 52.375)):
            Rectangle(SKETCH24_W, SKETCH24_H)
    extrude(amount=-CUT_EXTRUDE12_DEPTH, mode=Mode.SUBTRACT)

    # Sketch25 → Boss-Extrude8 (add)
    with BuildSketch(Plane(origin=(200, 0, 0), x_dir=(0, 0, -1), z_dir=(1, 0, 0))):
        with Locations((15, 59.925)):
            Rectangle(SKETCH25_W, SKETCH25_H)
        with Locations((15, 30.175)):
            Rectangle(SKETCH25_W, SKETCH25_H)
    extrude(amount=-BOSS_EXTRUDE8_DEPTH)

    # Sketch26 → Boss-Extrude9 (add)
    with BuildSketch(Plane(origin=(200, 0, 0), x_dir=(0, 0, -1), z_dir=(1, 0, 0))):
        with Locations((11.05, 52.175)):
            Rectangle(SKETCH26_W, SKETCH26_H)
        with Locations((18.95, 52.175)):
            Rectangle(SKETCH26_W, SKETCH26_H)
        with Locations((18.95, 22.425)):
            Rectangle(SKETCH26_W, SKETCH26_H)
        with Locations((11.05, 22.425)):
            Rectangle(SKETCH26_W, SKETCH26_H)
    extrude(amount=-BOSS_EXTRUDE9_DEPTH)

    # Sketch27 → Boss-Extrude10 (add)
    with BuildSketch(Plane(origin=(200, 0, 0), x_dir=(0, 0, -1), z_dir=(1, 0, 0))):
        Polygon((18.05, 22.425), (18.9, 22.425), (18.9, 29.975), (11.1, 29.975), (11.1, 22.425), (11.95, 22.425), (11.95, 29.125), (15, 29.125), (18.05, 29.125), align=None)
        Polygon((18.9, 14.875), (18.9, 22.425), (18.05, 22.425), (18.05, 15.725), (11.95, 15.725), (11.95, 22.425), (11.1, 22.425), (11.1, 14.875), align=None)
        Polygon((18.9, 44.625), (18.9, 52.175), (18.05, 52.175), (18.05, 45.475), (11.95, 45.475), (11.95, 52.175), (11.1, 52.175), (11.1, 44.625), align=None)
        Polygon((18.05, 52.175), (18.9, 52.175), (18.9, 59.725), (11.1, 59.725), (11.1, 52.175), (11.95, 52.175), (11.95, 58.875), (15, 58.875), (18.05, 58.875), align=None)
    extrude(amount=-BOSS_EXTRUDE10_DEPTH)

    # Sketch28 → Boss-Extrude11 (add)
    with BuildSketch(Plane(origin=(0, 0, -5), x_dir=(-1, 0, 0), z_dir=(0, 0, -1))):
        with Locations((-176.768468334, 36.353971187)):
            Rectangle(SKETCH28_W, SKETCH28_H)
    extrude(amount=-BOSS_EXTRUDE11_DEPTH)

    # Sketch29 → Boss-Extrude12 (add)
    with BuildSketch(Plane.XY.offset(BOSS_EXTRUDE12_START)):
        with Locations(Location((168, 62.125, 0), (0, 0, 180))):
            Circle(SKETCH29_R)
        with Locations(Location((168, 12.125, 0), (0, 0, 180))):
            Circle(SKETCH29_R)
    extrude(amount=BOSS_EXTRUDE12_DEPTH)

    # Sketch31 → Cut-Extrude13 (cut)
    with BuildSketch(Plane.ZY):
        Polygon((-175, 61.25), (-175, 64.25), (-205, 64.25), (-205, 58.25), align=None)
        Polygon((-205, 64.25), (-175, 64.25), (-175, 67.25), (-205, 70.25), align=None)
        Polygon((-145, 64.25), (-175, 64.25), (-175, 61.25), (-145, 58.25), align=None)
        Polygon((-175, 67.25), (-175, 64.25), (-145, 64.25), (-145, 70.25), align=None)
    extrude(amount=-CUT_EXTRUDE13_DEPTH, mode=Mode.SUBTRACT)


solid = part.part
